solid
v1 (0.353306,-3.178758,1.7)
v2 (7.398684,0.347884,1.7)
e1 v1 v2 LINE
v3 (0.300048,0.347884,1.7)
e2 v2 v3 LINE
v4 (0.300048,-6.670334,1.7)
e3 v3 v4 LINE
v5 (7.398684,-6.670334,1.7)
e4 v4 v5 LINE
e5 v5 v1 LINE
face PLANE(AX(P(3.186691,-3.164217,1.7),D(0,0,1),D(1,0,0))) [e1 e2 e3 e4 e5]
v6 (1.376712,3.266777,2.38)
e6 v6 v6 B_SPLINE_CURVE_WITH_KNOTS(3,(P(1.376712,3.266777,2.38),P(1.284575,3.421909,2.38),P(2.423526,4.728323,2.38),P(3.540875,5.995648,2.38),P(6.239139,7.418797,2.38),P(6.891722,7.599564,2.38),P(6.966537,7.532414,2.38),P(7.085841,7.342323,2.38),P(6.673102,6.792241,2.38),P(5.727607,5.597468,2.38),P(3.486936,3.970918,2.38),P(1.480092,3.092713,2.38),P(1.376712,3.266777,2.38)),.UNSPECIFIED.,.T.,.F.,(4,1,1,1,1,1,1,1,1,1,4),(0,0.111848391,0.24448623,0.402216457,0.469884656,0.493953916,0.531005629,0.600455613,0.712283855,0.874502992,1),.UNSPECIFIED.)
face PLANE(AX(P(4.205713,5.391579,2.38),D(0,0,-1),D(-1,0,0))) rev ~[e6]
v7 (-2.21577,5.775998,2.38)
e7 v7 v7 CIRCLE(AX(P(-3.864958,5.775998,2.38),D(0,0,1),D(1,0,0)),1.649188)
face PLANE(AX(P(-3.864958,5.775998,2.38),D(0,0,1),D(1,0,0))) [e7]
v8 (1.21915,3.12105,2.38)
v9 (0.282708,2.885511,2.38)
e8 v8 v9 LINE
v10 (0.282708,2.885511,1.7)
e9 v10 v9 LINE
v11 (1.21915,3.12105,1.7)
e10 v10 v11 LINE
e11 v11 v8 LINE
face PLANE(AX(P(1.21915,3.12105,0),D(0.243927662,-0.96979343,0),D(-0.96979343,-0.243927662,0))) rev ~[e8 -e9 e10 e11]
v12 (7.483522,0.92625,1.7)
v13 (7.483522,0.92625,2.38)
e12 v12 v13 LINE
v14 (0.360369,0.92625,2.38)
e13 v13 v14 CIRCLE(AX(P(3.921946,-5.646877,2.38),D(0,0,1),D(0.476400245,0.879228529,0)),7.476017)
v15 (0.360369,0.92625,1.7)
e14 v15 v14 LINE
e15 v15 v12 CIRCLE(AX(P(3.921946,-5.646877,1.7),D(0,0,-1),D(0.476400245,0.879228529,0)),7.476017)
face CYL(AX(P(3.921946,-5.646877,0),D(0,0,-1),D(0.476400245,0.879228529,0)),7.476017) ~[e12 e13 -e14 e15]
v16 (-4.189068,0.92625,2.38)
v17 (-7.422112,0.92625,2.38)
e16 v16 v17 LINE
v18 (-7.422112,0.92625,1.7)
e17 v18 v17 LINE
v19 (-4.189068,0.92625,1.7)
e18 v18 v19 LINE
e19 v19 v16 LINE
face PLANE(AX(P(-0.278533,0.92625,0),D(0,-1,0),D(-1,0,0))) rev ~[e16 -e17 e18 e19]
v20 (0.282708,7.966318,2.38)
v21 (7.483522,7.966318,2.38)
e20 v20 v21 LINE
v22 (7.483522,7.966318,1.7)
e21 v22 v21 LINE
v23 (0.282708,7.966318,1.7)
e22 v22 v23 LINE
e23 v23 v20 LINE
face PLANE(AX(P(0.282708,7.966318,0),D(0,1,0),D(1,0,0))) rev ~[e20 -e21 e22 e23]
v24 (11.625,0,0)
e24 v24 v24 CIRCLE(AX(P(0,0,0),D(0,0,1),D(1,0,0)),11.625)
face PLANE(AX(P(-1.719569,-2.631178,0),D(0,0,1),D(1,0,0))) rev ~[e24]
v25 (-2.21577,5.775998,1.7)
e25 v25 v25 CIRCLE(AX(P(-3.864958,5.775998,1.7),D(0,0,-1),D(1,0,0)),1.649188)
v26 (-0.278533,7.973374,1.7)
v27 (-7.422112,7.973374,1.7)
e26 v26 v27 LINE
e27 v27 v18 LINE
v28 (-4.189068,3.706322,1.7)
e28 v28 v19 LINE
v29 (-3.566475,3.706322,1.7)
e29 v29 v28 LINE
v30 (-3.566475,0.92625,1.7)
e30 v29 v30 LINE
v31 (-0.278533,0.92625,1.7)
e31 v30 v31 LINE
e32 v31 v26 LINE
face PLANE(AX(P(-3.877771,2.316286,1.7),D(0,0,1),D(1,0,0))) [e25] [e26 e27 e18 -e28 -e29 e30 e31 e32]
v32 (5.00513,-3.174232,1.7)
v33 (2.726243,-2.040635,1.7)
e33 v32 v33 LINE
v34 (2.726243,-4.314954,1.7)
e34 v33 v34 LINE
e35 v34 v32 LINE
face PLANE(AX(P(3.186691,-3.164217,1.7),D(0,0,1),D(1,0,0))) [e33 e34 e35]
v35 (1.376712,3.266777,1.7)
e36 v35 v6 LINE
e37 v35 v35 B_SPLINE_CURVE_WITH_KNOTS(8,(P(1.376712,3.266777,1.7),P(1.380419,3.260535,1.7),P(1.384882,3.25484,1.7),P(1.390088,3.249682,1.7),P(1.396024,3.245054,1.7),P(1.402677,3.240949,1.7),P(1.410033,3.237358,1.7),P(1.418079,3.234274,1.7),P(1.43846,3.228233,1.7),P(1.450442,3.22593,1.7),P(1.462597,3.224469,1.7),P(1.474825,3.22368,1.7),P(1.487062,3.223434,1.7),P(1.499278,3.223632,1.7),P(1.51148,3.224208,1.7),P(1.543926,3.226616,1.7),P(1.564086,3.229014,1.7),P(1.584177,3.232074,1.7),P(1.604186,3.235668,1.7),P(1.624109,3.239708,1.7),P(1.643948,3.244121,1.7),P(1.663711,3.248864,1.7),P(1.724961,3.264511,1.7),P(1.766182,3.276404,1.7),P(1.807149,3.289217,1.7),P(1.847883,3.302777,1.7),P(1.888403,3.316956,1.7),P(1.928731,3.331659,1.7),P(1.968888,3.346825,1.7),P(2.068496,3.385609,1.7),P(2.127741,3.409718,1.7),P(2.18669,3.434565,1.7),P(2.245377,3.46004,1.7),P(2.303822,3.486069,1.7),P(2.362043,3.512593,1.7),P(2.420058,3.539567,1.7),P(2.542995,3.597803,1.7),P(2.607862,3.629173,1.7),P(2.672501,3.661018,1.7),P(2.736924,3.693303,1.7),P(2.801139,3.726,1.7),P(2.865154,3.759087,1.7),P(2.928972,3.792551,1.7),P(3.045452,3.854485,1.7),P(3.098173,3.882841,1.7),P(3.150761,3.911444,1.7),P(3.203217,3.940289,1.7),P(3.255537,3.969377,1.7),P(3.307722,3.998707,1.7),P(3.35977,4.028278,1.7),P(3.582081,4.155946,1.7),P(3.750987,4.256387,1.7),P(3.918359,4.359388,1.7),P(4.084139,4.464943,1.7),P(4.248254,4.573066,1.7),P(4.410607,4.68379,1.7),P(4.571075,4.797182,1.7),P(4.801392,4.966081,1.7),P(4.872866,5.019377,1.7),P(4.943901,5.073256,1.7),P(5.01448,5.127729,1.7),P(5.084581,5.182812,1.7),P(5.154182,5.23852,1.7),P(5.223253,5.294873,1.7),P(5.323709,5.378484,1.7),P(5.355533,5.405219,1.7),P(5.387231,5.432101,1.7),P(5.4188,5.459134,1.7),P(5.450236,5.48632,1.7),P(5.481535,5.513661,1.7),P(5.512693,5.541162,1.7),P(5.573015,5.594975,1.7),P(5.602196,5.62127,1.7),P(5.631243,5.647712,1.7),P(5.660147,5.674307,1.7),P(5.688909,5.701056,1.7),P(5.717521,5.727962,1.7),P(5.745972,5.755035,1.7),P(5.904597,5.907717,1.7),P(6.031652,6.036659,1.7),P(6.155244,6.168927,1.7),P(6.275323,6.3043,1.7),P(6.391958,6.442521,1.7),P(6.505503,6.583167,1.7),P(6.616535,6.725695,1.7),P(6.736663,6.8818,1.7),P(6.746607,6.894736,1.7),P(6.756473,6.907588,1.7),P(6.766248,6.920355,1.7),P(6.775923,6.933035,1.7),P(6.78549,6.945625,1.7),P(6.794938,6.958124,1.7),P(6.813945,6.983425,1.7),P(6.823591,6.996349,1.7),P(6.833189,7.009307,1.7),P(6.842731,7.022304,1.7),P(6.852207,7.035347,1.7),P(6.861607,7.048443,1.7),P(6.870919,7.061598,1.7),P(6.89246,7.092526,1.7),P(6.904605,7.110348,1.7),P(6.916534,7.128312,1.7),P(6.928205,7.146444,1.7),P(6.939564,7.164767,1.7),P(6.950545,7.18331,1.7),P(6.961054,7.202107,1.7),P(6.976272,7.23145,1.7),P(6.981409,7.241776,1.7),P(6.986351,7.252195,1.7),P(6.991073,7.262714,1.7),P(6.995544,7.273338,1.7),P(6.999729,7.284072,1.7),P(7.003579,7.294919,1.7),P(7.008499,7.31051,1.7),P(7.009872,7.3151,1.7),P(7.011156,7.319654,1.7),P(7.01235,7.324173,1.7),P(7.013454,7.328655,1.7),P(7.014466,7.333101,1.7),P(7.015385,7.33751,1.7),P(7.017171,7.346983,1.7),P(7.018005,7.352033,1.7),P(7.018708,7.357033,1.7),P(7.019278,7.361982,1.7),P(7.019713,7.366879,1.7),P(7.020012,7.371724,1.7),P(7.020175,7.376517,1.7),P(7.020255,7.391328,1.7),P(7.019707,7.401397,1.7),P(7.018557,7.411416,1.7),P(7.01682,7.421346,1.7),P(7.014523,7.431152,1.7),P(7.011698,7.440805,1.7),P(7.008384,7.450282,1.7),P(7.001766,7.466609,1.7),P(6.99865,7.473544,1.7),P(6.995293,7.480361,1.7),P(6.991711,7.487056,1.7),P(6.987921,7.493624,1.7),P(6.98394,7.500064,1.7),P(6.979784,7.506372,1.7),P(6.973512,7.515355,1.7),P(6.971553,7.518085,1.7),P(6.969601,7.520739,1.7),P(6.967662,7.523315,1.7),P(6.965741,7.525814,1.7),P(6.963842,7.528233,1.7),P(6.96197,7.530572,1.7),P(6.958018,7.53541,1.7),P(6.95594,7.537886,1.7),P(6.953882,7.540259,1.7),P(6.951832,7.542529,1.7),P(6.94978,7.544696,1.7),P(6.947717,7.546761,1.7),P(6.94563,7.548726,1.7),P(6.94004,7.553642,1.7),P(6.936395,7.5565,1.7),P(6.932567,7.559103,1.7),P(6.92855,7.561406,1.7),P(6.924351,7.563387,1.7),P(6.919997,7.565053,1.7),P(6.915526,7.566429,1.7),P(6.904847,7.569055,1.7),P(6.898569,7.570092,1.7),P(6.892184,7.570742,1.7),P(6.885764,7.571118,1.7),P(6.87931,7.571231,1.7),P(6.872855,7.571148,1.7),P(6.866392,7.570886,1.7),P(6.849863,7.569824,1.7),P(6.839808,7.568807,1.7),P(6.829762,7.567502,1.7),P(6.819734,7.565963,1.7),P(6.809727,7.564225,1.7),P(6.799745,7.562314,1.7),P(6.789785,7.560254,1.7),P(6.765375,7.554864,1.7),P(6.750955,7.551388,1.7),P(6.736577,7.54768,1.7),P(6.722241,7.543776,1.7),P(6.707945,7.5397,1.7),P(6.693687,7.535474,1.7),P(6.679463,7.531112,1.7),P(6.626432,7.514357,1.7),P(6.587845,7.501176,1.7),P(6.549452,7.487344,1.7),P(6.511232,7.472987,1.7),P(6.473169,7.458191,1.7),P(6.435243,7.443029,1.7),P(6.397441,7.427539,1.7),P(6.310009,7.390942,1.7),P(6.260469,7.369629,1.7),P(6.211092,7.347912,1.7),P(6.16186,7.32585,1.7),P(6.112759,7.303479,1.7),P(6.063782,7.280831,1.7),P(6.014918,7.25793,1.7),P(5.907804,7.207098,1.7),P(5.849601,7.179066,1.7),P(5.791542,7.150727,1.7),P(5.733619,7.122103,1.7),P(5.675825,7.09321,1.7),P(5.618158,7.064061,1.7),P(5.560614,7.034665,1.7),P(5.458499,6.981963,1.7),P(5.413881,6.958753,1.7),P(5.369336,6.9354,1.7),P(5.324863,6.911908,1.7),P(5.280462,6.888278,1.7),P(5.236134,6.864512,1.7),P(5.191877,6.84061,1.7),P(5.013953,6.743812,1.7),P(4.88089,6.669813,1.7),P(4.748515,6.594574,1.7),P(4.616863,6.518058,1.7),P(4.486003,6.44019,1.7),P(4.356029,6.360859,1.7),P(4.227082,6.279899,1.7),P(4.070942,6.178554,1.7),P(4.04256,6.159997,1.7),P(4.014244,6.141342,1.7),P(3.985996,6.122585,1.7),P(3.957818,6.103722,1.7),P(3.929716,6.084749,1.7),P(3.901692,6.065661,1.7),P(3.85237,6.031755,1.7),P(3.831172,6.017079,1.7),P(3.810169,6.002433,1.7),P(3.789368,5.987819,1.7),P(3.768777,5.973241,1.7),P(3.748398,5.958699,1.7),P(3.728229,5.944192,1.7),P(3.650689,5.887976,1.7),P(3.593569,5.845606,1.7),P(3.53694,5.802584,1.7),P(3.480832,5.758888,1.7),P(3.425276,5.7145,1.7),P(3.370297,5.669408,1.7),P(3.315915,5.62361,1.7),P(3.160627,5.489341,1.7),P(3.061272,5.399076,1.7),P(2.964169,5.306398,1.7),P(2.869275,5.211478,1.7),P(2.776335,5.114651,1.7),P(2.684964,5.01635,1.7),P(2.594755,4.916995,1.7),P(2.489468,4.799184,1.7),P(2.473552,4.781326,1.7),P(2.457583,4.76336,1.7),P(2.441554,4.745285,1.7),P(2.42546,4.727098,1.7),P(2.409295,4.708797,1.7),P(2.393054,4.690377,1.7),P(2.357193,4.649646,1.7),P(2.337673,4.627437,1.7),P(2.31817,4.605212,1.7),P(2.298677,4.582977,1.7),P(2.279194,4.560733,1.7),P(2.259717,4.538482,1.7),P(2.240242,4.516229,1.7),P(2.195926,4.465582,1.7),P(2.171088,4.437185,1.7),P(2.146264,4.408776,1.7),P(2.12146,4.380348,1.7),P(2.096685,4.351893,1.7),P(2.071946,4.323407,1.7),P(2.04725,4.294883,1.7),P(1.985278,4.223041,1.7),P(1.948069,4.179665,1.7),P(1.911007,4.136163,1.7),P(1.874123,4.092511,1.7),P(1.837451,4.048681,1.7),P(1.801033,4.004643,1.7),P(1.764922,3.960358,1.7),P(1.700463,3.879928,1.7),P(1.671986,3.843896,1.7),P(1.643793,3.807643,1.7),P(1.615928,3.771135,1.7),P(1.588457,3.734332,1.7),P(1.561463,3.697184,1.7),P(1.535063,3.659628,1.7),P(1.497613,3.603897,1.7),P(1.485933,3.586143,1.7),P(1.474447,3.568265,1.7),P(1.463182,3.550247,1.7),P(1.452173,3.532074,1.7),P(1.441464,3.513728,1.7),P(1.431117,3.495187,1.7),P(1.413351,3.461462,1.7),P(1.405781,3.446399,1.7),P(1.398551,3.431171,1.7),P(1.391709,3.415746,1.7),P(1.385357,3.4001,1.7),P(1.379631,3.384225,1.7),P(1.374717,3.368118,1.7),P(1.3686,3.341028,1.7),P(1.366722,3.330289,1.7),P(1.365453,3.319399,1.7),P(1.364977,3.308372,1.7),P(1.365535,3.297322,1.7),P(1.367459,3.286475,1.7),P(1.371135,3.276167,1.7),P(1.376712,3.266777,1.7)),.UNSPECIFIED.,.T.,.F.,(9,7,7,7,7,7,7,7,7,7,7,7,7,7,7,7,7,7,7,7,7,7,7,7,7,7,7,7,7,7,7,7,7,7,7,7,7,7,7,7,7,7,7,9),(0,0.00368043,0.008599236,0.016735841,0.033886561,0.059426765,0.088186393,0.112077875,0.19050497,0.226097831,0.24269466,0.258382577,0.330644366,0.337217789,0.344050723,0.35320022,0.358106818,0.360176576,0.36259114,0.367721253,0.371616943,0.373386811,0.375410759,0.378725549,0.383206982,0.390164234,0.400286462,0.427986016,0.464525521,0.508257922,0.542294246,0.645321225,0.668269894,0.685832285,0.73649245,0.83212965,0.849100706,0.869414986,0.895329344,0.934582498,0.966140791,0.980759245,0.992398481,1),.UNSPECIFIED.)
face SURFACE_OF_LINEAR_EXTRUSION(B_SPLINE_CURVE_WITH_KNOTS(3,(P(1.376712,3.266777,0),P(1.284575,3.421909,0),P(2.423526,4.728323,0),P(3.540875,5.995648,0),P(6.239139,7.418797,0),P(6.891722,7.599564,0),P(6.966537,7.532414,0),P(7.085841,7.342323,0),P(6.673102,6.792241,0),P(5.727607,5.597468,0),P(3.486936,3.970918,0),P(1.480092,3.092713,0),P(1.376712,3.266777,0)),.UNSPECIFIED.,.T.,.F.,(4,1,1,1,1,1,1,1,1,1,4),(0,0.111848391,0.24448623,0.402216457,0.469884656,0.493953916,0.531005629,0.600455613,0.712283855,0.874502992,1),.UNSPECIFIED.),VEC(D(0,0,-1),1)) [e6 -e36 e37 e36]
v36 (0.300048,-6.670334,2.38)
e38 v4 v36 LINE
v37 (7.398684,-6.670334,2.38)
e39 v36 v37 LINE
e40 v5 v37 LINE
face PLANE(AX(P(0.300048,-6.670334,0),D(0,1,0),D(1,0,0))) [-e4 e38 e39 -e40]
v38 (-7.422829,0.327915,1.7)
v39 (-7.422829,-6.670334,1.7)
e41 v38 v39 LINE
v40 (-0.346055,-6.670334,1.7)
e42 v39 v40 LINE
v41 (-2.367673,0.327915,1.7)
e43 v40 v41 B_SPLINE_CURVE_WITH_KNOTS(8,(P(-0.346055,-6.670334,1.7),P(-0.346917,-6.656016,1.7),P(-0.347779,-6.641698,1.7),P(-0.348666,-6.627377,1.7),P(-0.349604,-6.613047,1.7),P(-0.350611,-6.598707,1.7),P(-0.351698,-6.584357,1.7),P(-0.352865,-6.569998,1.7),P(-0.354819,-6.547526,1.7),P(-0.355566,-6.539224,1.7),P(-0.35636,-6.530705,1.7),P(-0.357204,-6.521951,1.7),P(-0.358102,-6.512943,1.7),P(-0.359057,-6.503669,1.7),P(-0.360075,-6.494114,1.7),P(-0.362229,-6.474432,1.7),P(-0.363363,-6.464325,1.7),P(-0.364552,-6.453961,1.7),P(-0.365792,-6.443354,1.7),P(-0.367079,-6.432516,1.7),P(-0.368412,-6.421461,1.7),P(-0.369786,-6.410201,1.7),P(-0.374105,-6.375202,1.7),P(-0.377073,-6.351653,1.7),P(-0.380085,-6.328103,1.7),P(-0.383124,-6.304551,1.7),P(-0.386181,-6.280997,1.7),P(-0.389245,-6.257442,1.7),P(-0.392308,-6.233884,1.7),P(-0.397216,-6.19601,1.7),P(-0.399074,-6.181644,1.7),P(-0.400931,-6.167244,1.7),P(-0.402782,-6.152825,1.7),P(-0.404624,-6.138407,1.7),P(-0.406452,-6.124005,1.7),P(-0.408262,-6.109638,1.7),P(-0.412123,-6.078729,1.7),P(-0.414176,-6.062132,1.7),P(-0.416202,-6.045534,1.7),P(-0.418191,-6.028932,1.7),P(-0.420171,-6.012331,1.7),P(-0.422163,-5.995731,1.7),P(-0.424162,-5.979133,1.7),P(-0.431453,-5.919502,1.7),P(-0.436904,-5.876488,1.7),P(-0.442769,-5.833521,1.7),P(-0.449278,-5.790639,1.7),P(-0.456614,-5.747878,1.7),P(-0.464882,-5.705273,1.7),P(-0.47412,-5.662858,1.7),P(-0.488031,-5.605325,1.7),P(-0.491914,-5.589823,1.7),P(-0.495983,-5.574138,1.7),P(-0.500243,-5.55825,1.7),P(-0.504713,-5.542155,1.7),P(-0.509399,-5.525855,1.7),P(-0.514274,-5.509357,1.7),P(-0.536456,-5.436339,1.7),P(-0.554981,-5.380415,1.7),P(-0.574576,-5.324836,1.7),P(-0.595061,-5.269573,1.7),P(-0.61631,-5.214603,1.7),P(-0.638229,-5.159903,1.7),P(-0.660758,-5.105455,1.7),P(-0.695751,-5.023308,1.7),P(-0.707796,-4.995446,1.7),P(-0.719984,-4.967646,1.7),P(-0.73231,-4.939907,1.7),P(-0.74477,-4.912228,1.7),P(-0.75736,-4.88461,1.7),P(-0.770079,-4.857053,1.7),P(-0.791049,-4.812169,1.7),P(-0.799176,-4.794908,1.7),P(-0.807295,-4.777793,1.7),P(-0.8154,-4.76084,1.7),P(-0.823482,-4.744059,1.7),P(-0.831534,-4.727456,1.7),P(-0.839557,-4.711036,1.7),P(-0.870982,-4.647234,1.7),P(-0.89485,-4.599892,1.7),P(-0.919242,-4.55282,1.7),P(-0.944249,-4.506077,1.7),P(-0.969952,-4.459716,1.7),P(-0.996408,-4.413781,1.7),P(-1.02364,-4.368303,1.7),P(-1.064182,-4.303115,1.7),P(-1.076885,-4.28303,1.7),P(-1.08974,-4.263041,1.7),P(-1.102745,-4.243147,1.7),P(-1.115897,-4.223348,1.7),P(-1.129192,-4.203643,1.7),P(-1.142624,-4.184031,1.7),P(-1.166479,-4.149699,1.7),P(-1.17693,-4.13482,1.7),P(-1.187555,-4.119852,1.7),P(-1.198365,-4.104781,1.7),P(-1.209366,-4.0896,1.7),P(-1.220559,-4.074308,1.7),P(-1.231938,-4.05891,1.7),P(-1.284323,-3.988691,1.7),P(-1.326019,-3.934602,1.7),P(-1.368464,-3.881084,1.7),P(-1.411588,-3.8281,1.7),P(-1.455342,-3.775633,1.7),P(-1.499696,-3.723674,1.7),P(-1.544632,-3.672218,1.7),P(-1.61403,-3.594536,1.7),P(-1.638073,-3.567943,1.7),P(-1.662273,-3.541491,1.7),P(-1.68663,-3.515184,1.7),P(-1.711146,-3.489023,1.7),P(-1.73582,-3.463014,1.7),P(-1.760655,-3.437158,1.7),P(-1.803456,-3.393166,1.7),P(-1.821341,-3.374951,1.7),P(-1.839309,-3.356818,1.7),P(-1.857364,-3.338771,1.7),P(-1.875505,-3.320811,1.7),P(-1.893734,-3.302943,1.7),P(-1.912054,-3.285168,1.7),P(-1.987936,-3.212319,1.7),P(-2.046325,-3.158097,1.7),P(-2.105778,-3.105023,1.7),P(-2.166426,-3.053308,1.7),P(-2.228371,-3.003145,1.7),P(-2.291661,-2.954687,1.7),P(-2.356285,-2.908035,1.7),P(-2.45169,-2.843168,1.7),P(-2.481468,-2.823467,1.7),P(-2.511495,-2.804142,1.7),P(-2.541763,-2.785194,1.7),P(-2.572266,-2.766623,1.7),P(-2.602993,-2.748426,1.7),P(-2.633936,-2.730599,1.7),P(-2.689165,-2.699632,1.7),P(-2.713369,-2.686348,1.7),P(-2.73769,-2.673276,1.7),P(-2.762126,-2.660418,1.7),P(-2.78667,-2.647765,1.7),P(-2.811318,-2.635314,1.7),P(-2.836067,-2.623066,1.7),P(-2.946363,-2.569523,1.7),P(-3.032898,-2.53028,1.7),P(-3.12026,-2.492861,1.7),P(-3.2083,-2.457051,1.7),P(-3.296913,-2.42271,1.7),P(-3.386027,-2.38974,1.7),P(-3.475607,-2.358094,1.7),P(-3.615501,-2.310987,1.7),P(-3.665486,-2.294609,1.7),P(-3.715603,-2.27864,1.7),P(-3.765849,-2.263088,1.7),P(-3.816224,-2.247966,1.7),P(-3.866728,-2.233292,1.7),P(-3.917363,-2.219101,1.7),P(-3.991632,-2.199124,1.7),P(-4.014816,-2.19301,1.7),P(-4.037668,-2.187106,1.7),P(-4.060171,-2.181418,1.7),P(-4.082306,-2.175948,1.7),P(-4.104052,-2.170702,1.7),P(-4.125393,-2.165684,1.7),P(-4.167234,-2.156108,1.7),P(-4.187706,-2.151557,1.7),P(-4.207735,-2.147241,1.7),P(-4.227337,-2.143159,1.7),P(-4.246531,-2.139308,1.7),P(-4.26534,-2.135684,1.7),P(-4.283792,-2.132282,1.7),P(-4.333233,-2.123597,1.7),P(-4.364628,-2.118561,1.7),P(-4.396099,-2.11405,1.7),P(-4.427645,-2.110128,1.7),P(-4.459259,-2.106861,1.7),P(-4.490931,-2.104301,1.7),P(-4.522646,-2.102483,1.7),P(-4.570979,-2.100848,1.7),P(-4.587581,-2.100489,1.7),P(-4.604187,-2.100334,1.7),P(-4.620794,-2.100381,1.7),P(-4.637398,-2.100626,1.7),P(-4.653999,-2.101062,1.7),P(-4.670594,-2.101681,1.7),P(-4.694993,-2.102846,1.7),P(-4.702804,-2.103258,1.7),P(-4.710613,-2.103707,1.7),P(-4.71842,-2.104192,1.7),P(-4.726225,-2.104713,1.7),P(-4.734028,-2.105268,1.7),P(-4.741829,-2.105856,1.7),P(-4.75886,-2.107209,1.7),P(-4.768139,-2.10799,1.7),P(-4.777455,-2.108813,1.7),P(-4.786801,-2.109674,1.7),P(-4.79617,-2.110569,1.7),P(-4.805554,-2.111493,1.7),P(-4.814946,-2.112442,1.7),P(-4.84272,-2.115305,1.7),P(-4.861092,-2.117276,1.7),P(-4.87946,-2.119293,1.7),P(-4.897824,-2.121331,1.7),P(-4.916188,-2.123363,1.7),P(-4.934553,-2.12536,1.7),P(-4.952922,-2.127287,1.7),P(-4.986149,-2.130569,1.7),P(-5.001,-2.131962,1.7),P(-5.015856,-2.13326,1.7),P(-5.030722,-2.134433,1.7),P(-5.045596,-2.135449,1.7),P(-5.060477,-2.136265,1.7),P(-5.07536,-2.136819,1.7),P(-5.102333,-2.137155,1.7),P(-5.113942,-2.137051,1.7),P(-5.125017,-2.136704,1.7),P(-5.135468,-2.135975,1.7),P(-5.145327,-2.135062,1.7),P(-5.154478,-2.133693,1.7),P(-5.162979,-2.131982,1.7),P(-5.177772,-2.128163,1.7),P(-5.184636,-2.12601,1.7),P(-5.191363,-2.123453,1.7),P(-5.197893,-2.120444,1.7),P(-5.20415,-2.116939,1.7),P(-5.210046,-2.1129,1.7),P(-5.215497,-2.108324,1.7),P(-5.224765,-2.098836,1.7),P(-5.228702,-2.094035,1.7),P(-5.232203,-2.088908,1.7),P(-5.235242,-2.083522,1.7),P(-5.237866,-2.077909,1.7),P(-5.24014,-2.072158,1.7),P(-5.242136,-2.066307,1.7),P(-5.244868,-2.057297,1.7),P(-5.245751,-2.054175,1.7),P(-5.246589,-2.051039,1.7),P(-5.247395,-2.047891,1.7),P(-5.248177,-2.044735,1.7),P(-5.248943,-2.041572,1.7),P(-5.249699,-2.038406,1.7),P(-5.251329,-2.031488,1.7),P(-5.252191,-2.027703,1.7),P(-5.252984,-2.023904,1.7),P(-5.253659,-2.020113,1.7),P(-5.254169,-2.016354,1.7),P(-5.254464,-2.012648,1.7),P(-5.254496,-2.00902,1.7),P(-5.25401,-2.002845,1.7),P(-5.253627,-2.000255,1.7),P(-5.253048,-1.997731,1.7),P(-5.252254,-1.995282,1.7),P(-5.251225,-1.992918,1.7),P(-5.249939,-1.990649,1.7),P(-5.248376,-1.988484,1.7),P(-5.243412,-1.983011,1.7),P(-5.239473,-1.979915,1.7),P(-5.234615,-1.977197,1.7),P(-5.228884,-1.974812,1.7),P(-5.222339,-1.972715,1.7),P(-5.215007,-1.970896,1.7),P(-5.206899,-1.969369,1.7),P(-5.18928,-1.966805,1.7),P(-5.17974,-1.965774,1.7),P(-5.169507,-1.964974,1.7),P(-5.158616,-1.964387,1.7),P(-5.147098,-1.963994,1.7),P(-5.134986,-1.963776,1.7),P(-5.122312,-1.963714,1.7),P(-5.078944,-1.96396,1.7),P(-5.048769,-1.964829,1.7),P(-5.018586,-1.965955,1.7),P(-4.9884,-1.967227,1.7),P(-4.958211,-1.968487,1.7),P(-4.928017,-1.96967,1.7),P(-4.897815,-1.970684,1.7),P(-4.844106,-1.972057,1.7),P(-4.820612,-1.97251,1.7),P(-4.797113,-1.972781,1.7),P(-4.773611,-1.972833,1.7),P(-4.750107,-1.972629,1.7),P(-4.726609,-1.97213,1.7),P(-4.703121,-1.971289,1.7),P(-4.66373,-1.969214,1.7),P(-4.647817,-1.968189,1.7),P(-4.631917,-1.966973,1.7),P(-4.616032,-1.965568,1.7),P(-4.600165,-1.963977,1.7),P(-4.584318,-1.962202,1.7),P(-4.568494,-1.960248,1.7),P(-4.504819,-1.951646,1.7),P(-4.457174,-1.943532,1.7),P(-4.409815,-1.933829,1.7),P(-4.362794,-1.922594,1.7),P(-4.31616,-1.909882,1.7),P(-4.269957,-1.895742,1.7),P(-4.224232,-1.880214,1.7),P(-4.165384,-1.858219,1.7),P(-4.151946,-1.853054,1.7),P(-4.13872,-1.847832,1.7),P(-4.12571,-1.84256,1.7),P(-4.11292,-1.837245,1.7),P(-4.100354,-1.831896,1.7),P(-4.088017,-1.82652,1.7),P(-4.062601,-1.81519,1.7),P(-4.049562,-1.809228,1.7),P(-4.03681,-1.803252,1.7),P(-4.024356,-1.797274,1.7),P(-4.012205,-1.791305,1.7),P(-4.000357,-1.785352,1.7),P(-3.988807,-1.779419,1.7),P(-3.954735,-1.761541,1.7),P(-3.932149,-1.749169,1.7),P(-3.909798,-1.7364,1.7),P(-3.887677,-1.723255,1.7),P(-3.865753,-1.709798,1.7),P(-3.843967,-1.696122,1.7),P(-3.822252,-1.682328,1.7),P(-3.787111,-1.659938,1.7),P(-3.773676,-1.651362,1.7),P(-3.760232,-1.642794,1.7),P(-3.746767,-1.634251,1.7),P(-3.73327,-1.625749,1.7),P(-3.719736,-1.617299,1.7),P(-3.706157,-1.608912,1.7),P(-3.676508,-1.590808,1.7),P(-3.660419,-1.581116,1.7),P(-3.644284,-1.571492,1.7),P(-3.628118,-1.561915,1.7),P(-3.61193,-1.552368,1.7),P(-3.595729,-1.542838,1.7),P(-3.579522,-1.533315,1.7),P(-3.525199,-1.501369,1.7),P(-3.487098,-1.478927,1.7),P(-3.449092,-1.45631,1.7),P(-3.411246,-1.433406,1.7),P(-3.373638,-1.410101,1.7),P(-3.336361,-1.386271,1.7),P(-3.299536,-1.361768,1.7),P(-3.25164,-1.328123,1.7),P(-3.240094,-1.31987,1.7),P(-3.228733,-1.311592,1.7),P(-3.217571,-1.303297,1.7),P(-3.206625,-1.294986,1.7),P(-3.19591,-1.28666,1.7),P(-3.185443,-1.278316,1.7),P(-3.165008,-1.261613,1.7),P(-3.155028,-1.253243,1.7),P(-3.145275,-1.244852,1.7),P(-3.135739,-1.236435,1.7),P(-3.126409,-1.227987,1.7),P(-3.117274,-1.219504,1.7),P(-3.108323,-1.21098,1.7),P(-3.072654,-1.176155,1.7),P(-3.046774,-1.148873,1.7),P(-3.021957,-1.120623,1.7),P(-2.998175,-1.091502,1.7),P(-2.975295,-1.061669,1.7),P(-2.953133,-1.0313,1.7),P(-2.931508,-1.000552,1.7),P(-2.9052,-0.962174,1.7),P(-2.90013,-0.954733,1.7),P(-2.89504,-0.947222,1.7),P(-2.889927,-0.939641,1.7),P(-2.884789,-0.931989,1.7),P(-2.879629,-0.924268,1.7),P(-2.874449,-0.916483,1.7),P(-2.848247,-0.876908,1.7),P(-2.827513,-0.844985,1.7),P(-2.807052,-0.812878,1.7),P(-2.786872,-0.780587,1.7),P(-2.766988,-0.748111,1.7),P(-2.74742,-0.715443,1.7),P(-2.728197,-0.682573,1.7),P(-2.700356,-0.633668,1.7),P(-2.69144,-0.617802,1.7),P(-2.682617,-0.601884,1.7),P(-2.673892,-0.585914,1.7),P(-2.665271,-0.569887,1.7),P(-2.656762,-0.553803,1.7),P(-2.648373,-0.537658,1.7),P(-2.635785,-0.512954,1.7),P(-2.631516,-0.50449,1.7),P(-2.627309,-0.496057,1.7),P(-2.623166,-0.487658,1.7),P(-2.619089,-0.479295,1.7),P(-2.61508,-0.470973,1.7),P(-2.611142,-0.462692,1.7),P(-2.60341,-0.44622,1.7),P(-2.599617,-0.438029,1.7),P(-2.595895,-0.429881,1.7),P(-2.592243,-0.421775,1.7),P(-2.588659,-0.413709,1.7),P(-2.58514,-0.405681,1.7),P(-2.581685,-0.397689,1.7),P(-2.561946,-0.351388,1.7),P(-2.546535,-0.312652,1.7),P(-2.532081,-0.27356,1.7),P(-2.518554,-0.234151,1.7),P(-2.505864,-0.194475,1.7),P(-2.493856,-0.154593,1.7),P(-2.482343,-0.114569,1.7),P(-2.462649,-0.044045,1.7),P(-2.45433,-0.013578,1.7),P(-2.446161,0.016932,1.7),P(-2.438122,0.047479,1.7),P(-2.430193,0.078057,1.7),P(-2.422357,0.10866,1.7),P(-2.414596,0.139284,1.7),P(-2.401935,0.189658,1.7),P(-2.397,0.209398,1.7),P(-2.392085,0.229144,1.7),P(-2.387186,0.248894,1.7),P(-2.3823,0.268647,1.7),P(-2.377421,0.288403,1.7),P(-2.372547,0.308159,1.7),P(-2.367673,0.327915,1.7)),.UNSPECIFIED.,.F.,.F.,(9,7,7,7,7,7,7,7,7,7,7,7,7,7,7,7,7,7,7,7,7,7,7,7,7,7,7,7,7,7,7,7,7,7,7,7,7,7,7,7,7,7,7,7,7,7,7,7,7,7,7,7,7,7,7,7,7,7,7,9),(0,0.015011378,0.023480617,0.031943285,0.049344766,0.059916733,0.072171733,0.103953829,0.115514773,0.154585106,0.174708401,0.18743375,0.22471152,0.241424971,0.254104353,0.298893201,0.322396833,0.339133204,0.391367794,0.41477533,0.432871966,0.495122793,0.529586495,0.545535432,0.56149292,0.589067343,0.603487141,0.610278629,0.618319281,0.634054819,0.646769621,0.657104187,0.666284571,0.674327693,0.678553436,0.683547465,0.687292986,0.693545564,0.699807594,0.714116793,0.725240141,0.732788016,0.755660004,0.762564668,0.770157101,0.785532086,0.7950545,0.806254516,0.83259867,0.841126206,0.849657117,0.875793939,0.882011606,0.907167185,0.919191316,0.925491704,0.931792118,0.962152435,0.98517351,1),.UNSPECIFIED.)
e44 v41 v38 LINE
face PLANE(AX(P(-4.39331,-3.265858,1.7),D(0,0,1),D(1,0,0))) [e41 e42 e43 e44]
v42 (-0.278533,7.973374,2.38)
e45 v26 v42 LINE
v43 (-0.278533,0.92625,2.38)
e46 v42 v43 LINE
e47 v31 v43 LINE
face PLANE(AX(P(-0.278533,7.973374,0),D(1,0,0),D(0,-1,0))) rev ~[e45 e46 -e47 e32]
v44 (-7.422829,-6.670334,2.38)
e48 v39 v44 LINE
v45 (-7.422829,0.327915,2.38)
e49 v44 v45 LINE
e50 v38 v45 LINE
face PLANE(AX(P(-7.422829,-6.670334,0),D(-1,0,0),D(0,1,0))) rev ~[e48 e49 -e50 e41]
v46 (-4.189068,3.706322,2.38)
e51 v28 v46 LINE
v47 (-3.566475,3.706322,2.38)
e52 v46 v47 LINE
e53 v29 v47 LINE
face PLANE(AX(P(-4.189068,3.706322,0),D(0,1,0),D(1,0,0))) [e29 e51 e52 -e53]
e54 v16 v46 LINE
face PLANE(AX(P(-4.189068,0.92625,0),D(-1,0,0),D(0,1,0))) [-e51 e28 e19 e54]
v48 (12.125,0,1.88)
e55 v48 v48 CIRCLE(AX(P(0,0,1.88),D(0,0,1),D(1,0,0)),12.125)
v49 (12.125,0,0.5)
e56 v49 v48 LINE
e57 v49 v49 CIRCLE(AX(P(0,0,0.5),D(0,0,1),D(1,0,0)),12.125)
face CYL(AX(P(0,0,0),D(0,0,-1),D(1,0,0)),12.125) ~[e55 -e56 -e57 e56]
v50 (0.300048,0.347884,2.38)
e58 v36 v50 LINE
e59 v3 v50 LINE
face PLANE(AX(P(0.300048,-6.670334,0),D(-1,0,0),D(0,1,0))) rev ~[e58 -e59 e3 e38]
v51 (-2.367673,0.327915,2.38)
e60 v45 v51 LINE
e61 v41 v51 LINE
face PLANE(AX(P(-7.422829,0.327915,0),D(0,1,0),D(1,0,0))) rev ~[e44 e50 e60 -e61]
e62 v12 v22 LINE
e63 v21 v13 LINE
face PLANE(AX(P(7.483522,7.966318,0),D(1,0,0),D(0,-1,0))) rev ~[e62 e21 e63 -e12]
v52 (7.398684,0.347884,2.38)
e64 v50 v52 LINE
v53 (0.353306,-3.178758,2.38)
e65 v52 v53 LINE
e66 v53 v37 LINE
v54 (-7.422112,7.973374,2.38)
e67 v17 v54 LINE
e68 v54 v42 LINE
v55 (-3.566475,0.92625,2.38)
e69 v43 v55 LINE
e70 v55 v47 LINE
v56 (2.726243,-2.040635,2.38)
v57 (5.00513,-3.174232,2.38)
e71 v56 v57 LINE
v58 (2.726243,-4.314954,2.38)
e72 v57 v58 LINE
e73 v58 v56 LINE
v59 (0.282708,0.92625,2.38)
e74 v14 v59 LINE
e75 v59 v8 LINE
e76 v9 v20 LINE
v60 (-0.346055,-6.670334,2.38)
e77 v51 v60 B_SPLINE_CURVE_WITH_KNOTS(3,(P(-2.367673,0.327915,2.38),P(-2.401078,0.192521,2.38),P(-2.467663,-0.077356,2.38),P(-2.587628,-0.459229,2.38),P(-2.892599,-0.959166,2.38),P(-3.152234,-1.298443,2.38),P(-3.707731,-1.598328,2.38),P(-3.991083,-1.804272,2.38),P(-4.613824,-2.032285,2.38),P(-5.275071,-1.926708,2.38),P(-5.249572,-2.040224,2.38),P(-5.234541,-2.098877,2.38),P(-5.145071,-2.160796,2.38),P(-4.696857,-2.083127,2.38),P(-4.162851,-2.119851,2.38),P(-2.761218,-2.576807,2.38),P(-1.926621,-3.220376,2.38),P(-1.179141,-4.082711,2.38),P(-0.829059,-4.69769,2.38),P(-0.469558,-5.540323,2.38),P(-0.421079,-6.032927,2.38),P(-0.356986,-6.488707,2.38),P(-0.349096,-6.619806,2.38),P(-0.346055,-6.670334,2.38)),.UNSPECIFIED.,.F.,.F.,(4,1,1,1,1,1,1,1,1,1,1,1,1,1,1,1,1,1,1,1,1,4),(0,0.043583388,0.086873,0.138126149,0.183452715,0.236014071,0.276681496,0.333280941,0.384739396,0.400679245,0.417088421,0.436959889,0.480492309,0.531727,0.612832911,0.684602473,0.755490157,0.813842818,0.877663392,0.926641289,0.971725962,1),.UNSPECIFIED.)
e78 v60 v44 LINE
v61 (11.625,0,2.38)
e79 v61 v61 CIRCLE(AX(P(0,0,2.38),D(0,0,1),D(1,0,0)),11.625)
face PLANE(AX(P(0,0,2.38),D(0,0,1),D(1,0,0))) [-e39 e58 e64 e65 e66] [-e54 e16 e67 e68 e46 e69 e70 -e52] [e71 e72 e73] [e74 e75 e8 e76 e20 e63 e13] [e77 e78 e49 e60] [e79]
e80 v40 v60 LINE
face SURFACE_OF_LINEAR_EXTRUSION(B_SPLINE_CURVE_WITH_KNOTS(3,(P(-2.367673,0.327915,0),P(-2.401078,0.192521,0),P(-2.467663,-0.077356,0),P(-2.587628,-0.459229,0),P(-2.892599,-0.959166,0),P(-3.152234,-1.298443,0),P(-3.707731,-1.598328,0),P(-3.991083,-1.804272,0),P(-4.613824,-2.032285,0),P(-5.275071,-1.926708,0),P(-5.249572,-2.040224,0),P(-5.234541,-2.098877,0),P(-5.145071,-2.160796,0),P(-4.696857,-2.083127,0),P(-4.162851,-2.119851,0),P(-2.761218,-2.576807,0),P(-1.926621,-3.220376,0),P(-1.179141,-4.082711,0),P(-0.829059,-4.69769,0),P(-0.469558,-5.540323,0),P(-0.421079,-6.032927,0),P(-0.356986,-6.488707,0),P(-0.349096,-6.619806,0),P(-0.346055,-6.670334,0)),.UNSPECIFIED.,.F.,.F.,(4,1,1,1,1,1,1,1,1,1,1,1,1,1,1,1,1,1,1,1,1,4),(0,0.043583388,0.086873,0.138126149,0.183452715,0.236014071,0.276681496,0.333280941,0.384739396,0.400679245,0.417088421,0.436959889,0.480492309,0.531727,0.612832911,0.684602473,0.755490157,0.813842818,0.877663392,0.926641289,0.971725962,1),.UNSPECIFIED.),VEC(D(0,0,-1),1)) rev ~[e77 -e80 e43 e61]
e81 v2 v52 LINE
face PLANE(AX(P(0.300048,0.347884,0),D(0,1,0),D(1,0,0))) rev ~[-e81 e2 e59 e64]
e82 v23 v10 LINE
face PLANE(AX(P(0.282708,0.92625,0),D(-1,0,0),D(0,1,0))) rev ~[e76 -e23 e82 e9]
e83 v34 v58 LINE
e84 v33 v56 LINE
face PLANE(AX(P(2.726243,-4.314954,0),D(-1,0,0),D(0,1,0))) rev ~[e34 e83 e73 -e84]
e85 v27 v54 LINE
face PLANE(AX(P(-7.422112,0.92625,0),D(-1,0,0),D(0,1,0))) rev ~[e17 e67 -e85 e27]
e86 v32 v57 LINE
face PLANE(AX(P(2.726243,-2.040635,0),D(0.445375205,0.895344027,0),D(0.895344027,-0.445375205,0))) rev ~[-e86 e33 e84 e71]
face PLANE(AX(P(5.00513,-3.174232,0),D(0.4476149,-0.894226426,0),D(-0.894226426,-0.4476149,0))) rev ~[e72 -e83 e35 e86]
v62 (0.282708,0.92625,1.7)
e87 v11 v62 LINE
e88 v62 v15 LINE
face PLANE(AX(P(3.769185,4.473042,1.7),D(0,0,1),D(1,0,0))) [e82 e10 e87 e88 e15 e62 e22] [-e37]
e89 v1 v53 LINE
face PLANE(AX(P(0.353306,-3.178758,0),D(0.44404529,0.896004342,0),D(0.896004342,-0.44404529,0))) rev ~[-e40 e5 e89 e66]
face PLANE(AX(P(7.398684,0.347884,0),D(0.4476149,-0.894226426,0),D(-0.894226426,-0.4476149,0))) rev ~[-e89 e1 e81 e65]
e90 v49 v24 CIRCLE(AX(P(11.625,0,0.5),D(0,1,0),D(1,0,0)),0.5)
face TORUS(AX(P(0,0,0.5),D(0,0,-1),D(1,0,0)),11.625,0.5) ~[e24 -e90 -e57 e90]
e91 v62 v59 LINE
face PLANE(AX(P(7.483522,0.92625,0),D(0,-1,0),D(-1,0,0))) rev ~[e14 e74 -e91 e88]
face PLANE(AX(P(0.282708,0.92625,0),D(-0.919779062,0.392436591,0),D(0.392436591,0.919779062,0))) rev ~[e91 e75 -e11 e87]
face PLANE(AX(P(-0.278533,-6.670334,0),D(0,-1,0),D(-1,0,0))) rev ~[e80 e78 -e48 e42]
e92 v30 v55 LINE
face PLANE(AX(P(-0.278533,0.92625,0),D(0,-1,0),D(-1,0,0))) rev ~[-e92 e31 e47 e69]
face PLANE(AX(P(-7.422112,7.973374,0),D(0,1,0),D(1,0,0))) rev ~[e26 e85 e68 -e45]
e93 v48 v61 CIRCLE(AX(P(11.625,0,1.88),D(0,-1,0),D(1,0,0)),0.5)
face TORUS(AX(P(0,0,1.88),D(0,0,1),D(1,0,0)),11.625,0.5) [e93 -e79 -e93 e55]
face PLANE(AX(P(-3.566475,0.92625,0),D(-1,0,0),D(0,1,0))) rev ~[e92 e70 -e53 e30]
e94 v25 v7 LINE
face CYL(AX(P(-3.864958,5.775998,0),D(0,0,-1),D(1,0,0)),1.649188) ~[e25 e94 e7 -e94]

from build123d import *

# Parameters (mm, degrees)
F1_R      = 12.125
F1_W      = 7.0986367516
F1_H      = 7.0182182118
F2_DEPTH  = 2.38
F3_R      = 0.5
F4_R      = 0.5
F1_W_2    = 0.6225926336
F1_H_2    = 2.7800722164
F1_R_2    = 1.6491882735
F5_DEPTH  = 1.7
F6_DEPTH  = 2.38
F7_DEPTH  = 1.7
F8_DEPTH  = 2.38
F9_DEPTH  = 1.7
F10_DEPTH = 2.38
F11_DEPTH = 1.7
F12_DEPTH = 2.38


# Not quite as in the source:
# - a feature names something its author has since deleted; it is built from what else it names


with BuildPart() as f2:
    # F1 (on Top) → F2 (new body)
    with BuildSketch(Plane.XY):
        Circle(F1_R)
        Polygon((-7.4228290468, -6.6703339335), (-7.4228290468, 0.3279154543), (-2.3676725104, 0.3279154543), (-0.2785333199, 0.3279154543), (-0.2785333199, -6.6703339335), (-0.3460554872, -6.6703339335), align=None, mode=Mode.SUBTRACT)
        with Locations((3.8493661203, -3.1612248276)):
            Rectangle(F1_W, F1_H, mode=Mode.SUBTRACT)
        Polygon((-7.4221123941, 0.9262498352), (-7.4221123941, 7.9733738676), (-0.2785333199, 7.9733738676), (-0.2785333199, 0.9262498352), (-3.5664748866, 0.9262498352), (-4.1890675202, 0.9262498352), align=None, mode=Mode.SUBTRACT)
        Polygon((0.2827075659, 2.8855106793), (0.2827075659, 7.9663181677), (7.483521942, 7.9663181677), (7.483521942, 0.9262498352), (0.3603694204, 0.9262498352), (0.2827075659, 0.9262498352), align=None, mode=Mode.SUBTRACT)
    extrude(amount=F2_DEPTH)

    # F3
    f3_edges = [f2.edges().sort_by_distance(p)[0] for p in [
        (-12.125, 0, 2.38),
    ]]
    fillet(f3_edges, radius=F3_R)

    # F4
    f4_edges = [f2.edges().sort_by_distance(p)[0] for p in [
        (-12.125, 0, 0),
    ]]
    fillet(f4_edges, radius=F4_R)

    # F1 (on Top) → F5 (join)
    with BuildSketch(Plane.XY):
        with Locations((-3.8777712034, 2.3162859434)):
            Rectangle(F1_W_2, F1_H_2)
        Polygon((-0.2785333199, 7.9733738676), (-7.4221123941, 7.9733738676), (-7.4221123941, 0.9262498352), (-4.1890675202, 0.9262498352), (-4.1890675202, 3.7063220516), (-3.5664748866, 3.7063220516), (-3.5664748866, 0.9262498352), (-0.2785333199, 0.9262498352), align=None)
        with Locations((-3.8649578562, 5.7759984099)):
            Circle(F1_R_2, mode=Mode.SUBTRACT)
        with Locations((-3.8649578562, 5.7759984099)):
            Circle(F1_R_2)
    extrude(amount=F5_DEPTH)

    # F1 (on Top) → F6 (join, through all)
    with BuildSketch(Plane.XY):
        with Locations((-3.8649578562, 5.7759984099)):
            Circle(F1_R_2)
        with Locations((-3.8777712034, 2.3162859434)):
            Rectangle(F1_W_2, F1_H_2)
    extrude(amount=F6_DEPTH)

    # F1 (on Top) → F7 (join)
    with BuildSketch(Plane.XY):
        Polygon((7.3986844961, 0.3478842783), (0.3000477445, 0.3478842783), (0.3000477445, -6.6703339335), (7.3986844961, -6.6703339335), (0.3533055715, -3.1787578482), align=None)
        Polygon((7.3986844961, -6.6703339335), (7.3986844961, 0.3478842783), (0.3533055715, -3.1787578482), align=None)
        Polygon((2.7262428775, -4.3149543926), (2.7262428775, -2.0406346302), (5.0051301037, -3.174232257), align=None, mode=Mode.SUBTRACT)
        Polygon((5.0051301037, -3.174232257), (2.7262428775, -2.0406346302), (2.7262428775, -4.3149543926), align=None)
    extrude(amount=F7_DEPTH)

    # F1 (on Top) → F8 (join, through all)
    with BuildSketch(Plane.XY):
        Polygon((7.3986844961, -6.6703339335), (7.3986844961, 0.3478842783), (0.3533055715, -3.1787578482), align=None)
        Polygon((2.7262428775, -4.3149543926), (2.7262428775, -2.0406346302), (5.0051301037, -3.174232257), align=None, mode=Mode.SUBTRACT)
    extrude(amount=F8_DEPTH)

    # F1 (on Top) → F9 (join)
    with BuildSketch(Plane.XY):
        with BuildLine():
            Line((7.483521942, 7.9663181677), (0.2827075659, 7.9663181677))
            Line((0.2827075659, 7.9663181677), (0.2827075659, 2.8855106793))
            Line((0.2827075659, 2.8855106793), (1.2191495625, 3.121049609))
            Line((1.2191495625, 3.121049609), (0.2827075659, 0.9262498352))
            Line((0.2827075659, 0.9262498352), (0.3603694204, 0.9262498352))
            ThreePointArc((0.3603694204, 0.9262498352), (3.9219456812, 1.8291393853), (7.483521942, 0.9262498352))
            Line((7.483521942, 0.9262498352), (7.483521942, 7.9663181677))
        make_face()
        with BuildLine():
            add(Edge.make_bspline(
                [(1.3767119963, 3.2667766791), (1.2845749547, 3.4219093882), (2.4235264698, 4.7283232609), (3.5408753586, 5.9956475692), (6.2391393141, 7.418797197), (6.8917216898, 7.5995638626), (6.9665371868, 7.5324135615), (7.0858412946, 7.3423232683), (6.6731021166, 6.7922406039), (5.7276068284, 5.5974675028), (3.4869356373, 3.9709181084), (1.4800923213, 3.0927134618), (1.3767119963, 3.2667766791)],
                knots=[0, 0, 0, 0, 0.1118483914, 0.24448623, 0.4022164571, 0.4698846563, 0.4939539155, 0.5310056289, 0.6004556126, 0.7122838549, 0.8745029919, 1, 1, 1, 1], degree=3))
        make_face(mode=Mode.SUBTRACT)
        with BuildLine():
            add(Edge.make_bspline(
                [(1.3767119963, 3.2667766791), (1.2845749547, 3.4219093882), (2.4235264698, 4.7283232609), (3.5408753586, 5.9956475692), (6.2391393141, 7.418797197), (6.8917216898, 7.5995638626), (6.9665371868, 7.5324135615), (7.0858412946, 7.3423232683), (6.6731021166, 6.7922406039), (5.7276068284, 5.5974675028), (3.4869356373, 3.9709181084), (1.4800923213, 3.0927134618), (1.3767119963, 3.2667766791)],
                knots=[0, 0, 0, 0, 0.1118483914, 0.24448623, 0.4022164571, 0.4698846563, 0.4939539155, 0.5310056289, 0.6004556126, 0.7122838549, 0.8745029919, 1, 1, 1, 1], degree=3))
        make_face()
        with BuildLine():
            Line((0.3603694204, 0.9262498352), (7.483521942, 0.9262498352))
            ThreePointArc((7.483521942, 0.9262498352), (3.9219456812, 1.8291393853), (0.3603694204, 0.9262498352))
        make_face()
        Polygon((1.2191495625, 3.121049609), (0.2827075659, 2.8855106793), (0.2827075659, 0.9262498352), align=None)
    extrude(amount=F9_DEPTH)

    # F1 (on Top) → F10 (join, through all)
    with BuildSketch(Plane.XY):
        Polygon((1.2191495625, 3.121049609), (0.2827075659, 2.8855106793), (0.2827075659, 0.9262498352), align=None)
        with BuildLine():
            Line((0.3603694204, 0.9262498352), (7.483521942, 0.9262498352))
            ThreePointArc((7.483521942, 0.9262498352), (3.9219456812, 1.8291393853), (0.3603694204, 0.9262498352))
        make_face()
        with BuildLine():
            add(Edge.make_bspline(
                [(1.3767119963, 3.2667766791), (1.2845749547, 3.4219093882), (2.4235264698, 4.7283232609), (3.5408753586, 5.9956475692), (6.2391393141, 7.418797197), (6.8917216898, 7.5995638626), (6.9665371868, 7.5324135615), (7.0858412946, 7.3423232683), (6.6731021166, 6.7922406039), (5.7276068284, 5.5974675028), (3.4869356373, 3.9709181084), (1.4800923213, 3.0927134618), (1.3767119963, 3.2667766791)],
                knots=[0, 0, 0, 0, 0.1118483914, 0.24448623, 0.4022164571, 0.4698846563, 0.4939539155, 0.5310056289, 0.6004556126, 0.7122838549, 0.8745029919, 1, 1, 1, 1], degree=3))
        make_face()
    extrude(amount=F10_DEPTH)

    # F1 (on Top) → F11 (join)
    with BuildSketch(Plane.XY):
        with BuildLine():
            Line((-2.3676725104, 0.3279154543), (-7.4228290468, 0.3279154543))
            Line((-7.4228290468, 0.3279154543), (-7.4228290468, -6.6703339335))
            Line((-7.4228290468, -6.6703339335), (-0.3460554872, -6.6703339335))
            add(Edge.make_bspline(
                [(-2.3676725104, 0.3279154543), (-2.4010776229, 0.1925208975), (-2.4676626782, -0.0773555796), (-2.5876283556, -0.4592288495), (-2.8925989526, -0.9591658513), (-3.1522335022, -1.2984425332), (-3.7077309843, -1.5983279611), (-3.9910833592, -1.8042724956), (-4.6138242999, -2.0322850474), (-5.2750707973, -1.9267077545), (-5.2495717166, -2.0402242976), (-5.2345405936, -2.0988768979), (-5.1450714886, -2.160796158), (-4.6968573849, -2.0831274685), (-4.1628510391, -2.1198506981), (-2.7612179261, -2.5768069629), (-1.9266213932, -3.2203760963), (-1.1791410617, -4.0827112095), (-0.8290586767, -4.6976898082), (-0.4695580442, -5.5403229192), (-0.4210791981, -6.0329268408), (-0.3569856889, -6.488706617), (-0.3490962485, -6.6198055594), (-0.3460554872, -6.6703339335)],
                knots=[0, 0, 0, 0, 0.0435833884, 0.086873, 0.1381261489, 0.1834527151, 0.2360140714, 0.2766814959, 0.3332809415, 0.3847393962, 0.400679245, 0.417088421, 0.4369598891, 0.4804923093, 0.5317269995, 0.6128329106, 0.6846024733, 0.7554901569, 0.8138428178, 0.8776633918, 0.9266412888, 0.9717259625, 1, 1, 1, 1], degree=3))
        make_face()
        with BuildLine():
            Line((-0.2785333199, 0.3279154543), (-2.3676725104, 0.3279154543))
            add(Edge.make_bspline(
                [(-2.3676725104, 0.3279154543), (-2.4010776229, 0.1925208975), (-2.4676626782, -0.0773555796), (-2.5876283556, -0.4592288495), (-2.8925989526, -0.9591658513), (-3.1522335022, -1.2984425332), (-3.7077309843, -1.5983279611), (-3.9910833592, -1.8042724956), (-4.6138242999, -2.0322850474), (-5.2750707973, -1.9267077545), (-5.2495717166, -2.0402242976), (-5.2345405936, -2.0988768979), (-5.1450714886, -2.160796158), (-4.6968573849, -2.0831274685), (-4.1628510391, -2.1198506981), (-2.7612179261, -2.5768069629), (-1.9266213932, -3.2203760963), (-1.1791410617, -4.0827112095), (-0.8290586767, -4.6976898082), (-0.4695580442, -5.5403229192), (-0.4210791981, -6.0329268408), (-0.3569856889, -6.488706617), (-0.3490962485, -6.6198055594), (-0.3460554872, -6.6703339335)],
                knots=[0, 0, 0, 0, 0.0435833884, 0.086873, 0.1381261489, 0.1834527151, 0.2360140714, 0.2766814959, 0.3332809415, 0.3847393962, 0.400679245, 0.417088421, 0.4369598891, 0.4804923093, 0.5317269995, 0.6128329106, 0.6846024733, 0.7554901569, 0.8138428178, 0.8776633918, 0.9266412888, 0.9717259625, 1, 1, 1, 1], degree=3))
            Line((-0.3460554872, -6.6703339335), (-0.2785333199, -6.6703339335))
            Line((-0.2785333199, -6.6703339335), (-0.2785333199, 0.3279154543))
        make_face()
    extrude(amount=F11_DEPTH)

    # F1 (on Top) → F12 (join, through all)
    with BuildSketch(Plane.XY):
        with BuildLine():
            Line((-0.2785333199, 0.3279154543), (-2.3676725104, 0.3279154543))
            add(Edge.make_bspline(
                [(-2.3676725104, 0.3279154543), (-2.4010776229, 0.1925208975), (-2.4676626782, -0.0773555796), (-2.5876283556, -0.4592288495), (-2.8925989526, -0.9591658513), (-3.1522335022, -1.2984425332), (-3.7077309843, -1.5983279611), (-3.9910833592, -1.8042724956), (-4.6138242999, -2.0322850474), (-5.2750707973, -1.9267077545), (-5.2495717166, -2.0402242976), (-5.2345405936, -2.0988768979), (-5.1450714886, -2.160796158), (-4.6968573849, -2.0831274685), (-4.1628510391, -2.1198506981), (-2.7612179261, -2.5768069629), (-1.9266213932, -3.2203760963), (-1.1791410617, -4.0827112095), (-0.8290586767, -4.6976898082), (-0.4695580442, -5.5403229192), (-0.4210791981, -6.0329268408), (-0.3569856889, -6.488706617), (-0.3490962485, -6.6198055594), (-0.3460554872, -6.6703339335)],
                knots=[0, 0, 0, 0, 0.0435833884, 0.086873, 0.1381261489, 0.1834527151, 0.2360140714, 0.2766814959, 0.3332809415, 0.3847393962, 0.400679245, 0.417088421, 0.4369598891, 0.4804923093, 0.5317269995, 0.6128329106, 0.6846024733, 0.7554901569, 0.8138428178, 0.8776633918, 0.9266412888, 0.9717259625, 1, 1, 1, 1], degree=3))
            Line((-0.3460554872, -6.6703339335), (-0.2785333199, -6.6703339335))
            Line((-0.2785333199, -6.6703339335), (-0.2785333199, 0.3279154543))
        make_face()
    extrude(amount=F12_DEPTH)


solid = f2.part
